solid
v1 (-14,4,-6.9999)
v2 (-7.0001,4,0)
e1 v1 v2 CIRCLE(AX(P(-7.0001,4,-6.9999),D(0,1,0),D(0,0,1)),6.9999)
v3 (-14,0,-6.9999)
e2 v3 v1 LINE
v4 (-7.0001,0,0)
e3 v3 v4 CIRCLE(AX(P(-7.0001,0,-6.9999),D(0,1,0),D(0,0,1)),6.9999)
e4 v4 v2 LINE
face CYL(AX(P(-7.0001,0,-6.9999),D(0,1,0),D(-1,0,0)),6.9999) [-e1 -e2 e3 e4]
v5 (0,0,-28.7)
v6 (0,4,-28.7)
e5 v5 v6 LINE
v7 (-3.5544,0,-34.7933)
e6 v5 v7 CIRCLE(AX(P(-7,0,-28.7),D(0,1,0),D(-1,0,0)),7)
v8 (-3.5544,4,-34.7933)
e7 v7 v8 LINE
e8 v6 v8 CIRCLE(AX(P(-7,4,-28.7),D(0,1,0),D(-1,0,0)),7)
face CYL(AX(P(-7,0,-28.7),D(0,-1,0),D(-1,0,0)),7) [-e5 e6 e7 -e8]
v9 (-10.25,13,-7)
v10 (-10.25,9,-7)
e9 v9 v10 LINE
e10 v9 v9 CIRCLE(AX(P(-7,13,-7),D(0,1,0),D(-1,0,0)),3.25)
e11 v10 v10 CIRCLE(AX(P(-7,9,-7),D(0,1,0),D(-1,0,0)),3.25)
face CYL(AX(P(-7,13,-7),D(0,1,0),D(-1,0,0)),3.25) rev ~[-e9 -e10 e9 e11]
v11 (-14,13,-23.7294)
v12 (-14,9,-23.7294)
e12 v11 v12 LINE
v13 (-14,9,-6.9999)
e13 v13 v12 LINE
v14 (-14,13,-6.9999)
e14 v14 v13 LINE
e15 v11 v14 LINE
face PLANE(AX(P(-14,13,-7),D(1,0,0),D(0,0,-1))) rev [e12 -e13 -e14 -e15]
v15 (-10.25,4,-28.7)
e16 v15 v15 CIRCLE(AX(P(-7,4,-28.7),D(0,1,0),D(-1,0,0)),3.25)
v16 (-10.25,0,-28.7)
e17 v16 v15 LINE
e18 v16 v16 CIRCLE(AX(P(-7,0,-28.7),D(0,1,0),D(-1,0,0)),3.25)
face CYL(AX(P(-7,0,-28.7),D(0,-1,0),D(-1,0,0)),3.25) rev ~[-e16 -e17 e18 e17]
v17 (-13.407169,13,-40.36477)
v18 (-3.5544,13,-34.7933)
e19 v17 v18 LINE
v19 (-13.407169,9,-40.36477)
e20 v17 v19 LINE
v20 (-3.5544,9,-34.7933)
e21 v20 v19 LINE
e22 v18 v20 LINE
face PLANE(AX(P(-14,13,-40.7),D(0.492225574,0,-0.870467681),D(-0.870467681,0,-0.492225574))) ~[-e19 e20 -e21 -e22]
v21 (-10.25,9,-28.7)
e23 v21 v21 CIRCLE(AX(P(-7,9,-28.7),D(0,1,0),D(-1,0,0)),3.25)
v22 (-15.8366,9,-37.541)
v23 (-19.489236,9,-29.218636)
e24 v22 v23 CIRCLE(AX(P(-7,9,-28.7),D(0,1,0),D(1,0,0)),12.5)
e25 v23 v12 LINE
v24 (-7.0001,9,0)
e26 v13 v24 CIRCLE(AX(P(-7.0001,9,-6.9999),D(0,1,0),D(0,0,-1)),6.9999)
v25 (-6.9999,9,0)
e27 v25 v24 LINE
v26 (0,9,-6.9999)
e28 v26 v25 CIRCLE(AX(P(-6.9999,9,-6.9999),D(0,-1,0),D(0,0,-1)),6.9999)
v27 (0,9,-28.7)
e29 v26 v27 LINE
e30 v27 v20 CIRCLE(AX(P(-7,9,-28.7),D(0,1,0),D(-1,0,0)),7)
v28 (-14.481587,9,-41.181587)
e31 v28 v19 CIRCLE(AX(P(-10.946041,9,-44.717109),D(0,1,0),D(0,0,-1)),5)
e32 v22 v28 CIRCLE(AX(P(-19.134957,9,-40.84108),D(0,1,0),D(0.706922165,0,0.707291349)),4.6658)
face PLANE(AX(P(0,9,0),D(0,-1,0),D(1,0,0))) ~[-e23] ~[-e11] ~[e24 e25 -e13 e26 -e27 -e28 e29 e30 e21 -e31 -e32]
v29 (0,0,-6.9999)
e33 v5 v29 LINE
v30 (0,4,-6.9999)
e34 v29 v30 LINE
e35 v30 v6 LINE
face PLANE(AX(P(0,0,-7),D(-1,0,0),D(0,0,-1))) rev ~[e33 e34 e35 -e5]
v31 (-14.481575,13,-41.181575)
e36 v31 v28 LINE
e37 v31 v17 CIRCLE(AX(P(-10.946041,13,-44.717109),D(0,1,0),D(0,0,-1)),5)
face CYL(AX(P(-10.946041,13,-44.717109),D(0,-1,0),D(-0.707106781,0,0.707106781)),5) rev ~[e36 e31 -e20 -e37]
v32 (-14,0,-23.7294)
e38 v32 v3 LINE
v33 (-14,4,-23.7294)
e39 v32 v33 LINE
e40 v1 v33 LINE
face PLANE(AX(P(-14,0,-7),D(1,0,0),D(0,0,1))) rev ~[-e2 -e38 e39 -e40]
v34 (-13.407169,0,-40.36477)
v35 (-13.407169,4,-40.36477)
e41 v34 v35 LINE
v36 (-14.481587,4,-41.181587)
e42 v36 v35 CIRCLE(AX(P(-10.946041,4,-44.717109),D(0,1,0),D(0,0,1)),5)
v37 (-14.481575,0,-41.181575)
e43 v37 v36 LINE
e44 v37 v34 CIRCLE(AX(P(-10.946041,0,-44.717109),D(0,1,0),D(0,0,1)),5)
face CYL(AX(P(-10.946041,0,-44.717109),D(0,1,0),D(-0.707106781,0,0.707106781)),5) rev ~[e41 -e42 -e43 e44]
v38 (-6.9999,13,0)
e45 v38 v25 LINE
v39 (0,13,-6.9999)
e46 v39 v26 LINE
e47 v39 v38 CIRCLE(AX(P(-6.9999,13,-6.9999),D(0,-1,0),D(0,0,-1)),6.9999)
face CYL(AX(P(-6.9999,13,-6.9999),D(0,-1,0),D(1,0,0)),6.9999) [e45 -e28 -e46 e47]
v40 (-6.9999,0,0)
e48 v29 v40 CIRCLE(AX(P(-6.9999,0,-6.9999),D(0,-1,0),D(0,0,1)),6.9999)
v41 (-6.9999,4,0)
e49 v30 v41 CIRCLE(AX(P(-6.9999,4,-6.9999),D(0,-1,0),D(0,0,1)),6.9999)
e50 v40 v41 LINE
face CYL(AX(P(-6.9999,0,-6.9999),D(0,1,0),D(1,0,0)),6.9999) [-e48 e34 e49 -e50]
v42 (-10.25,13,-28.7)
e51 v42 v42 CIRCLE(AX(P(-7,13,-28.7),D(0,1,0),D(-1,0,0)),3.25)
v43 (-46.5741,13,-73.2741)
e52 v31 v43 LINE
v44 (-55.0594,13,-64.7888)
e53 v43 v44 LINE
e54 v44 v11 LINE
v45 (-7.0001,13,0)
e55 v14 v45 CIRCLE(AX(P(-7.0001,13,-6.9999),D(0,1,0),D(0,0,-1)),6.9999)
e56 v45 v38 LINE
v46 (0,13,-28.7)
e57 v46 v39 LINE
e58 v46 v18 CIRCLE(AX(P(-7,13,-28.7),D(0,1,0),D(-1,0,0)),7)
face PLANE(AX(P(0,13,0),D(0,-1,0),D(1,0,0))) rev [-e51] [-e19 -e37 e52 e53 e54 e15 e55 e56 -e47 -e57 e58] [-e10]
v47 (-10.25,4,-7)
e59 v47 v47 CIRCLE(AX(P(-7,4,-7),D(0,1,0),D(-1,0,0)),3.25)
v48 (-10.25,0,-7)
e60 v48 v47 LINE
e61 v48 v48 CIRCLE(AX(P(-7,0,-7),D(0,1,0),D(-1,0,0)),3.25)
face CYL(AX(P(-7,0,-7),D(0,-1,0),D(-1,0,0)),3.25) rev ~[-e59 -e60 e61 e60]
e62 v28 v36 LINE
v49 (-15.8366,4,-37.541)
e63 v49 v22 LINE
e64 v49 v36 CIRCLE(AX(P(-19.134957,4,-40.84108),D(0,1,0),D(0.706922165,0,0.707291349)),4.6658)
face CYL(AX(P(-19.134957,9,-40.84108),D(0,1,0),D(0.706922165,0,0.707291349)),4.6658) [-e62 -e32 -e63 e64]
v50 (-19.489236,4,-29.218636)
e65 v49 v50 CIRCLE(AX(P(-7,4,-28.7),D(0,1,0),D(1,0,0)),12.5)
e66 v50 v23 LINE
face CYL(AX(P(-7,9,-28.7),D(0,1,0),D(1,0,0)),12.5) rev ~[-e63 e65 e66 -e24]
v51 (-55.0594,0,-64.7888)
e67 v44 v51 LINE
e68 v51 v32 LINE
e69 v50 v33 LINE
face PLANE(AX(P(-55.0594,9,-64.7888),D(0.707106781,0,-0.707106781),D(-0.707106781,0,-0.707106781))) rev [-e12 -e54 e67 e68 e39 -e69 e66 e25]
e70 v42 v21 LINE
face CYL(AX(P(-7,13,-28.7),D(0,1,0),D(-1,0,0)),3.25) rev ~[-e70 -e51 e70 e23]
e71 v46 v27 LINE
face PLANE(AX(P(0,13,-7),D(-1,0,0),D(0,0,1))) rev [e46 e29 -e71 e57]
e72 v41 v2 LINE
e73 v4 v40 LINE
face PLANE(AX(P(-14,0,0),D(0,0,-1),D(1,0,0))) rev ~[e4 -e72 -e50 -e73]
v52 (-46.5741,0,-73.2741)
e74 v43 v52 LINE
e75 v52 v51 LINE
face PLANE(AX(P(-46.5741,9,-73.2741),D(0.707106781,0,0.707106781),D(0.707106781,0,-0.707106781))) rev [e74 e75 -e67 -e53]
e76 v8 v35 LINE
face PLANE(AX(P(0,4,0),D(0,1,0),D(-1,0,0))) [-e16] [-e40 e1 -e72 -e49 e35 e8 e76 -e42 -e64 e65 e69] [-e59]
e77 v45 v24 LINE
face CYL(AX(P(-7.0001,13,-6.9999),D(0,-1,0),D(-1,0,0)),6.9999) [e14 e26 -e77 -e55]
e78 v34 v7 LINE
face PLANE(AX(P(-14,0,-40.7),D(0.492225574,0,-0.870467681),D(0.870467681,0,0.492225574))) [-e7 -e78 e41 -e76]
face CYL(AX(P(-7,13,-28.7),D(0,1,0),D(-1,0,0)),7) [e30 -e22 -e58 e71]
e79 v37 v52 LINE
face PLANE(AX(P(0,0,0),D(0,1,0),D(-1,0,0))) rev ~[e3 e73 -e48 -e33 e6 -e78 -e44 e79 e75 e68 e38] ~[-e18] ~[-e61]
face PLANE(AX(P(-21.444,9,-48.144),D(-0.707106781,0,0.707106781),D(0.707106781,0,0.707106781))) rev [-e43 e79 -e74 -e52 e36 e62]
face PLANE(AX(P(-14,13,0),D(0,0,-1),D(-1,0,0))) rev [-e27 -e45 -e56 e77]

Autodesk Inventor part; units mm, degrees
ref_plane "YZ Plane" through (0, 0, 0) normal (1, 0, 0) x (0, 1, 0)
ref_plane "XZ Plane" through (0, 0, 0) normal (0, 1, 0) x (-1, 0, 0)
ref_plane "XY Plane" through (0, 0, 0) normal (0, 0, 1) x (1, 0, 0)
sketch "Sketch1" plane through (0, 0, 0) normal (0, 1, 0) x (-1, 0, 0)
  line L0 (14, 0) -> (0, 0)
  line L1 (0, 0) -> (0, -35.7)
  line L2 (0, -35.7) -> (14, -35.7)
  line L3 (14, -35.7) -> (14, 0)
  circle A0 centre (7, -7) radius 3.25
  circle A1 centre (7, -28.7) radius 3.25
  arc A2 (14, -7) -> (0, -7) centre (7, -7) ccw
  line L4 (14, -35.7) -> (14, -40.7)
  line L5 (14, -40.7) -> (8.75, -40.7)
  line L6 (5.25, -40.7) -> (0, -40.7)
  line L7 (0, -40.7) -> (0, -35.7)
  line L8 (8.75, -40.7) -> (5.25, -40.7)
  line L9 (14, -40.7) -> (46.5741, -73.2741)
  line L10 (46.5741, -73.2741) -> (55.0594, -64.7888)
  line L11 (55.0594, -64.7888) -> (14, -23.7294)
  circle A3 centre (7, -28.7) radius 7
  line L12 (14, -40.7) -> (3.5544, -34.7933)
  point P0 (7, -35.7)
  point P1 (11.375, -40.7)
  point P2 (7, 0)
  point P3 (0, -28.7)
  dimension "d0" = 6.5
  dimension "d1" = 21.7
  dimension "d2" = 7
  dimension "d3" = 7
  dimension "d4" = 14
  dimension "d9" = 5
  dimension "d20" = 12
  dimension "d21" = 135
extrude "Extrusion1" add sketch "Sketch1" along normal blind 4 contours L3 A2 L0 | A2 L1 L0 | A2 L3 A3 L1 | L11 L10 L9 L4 L3 | A3 | L3 L2 A3 | A3 L2 L12 | L4 L12 L2
fillet "Fillet1" radius 5 1 edges at (-14, 2, -40.7)
sketch "Sketch3" plane through (0, 4, 0) normal (0, 1, 0) x (1, 0, 0)
  line L0 (-14, 0) -> (0, 0) projected
  line L1 (0, 0) -> (0, 28.7) projected
  arc A0 (0, 28.7) -> (-3.5544, 34.7933) centre (-7, 28.7) ccw projected
  line L2 (-3.5544, 34.7933) -> (-13.4072, 40.3648) projected
  arc A1 (-14.4816, 41.1816) -> (-13.4072, 40.3648) centre (-10.946, 44.7171) ccw projected
  line L3 (-14.4816, 41.1816) -> (-46.5741, 73.2741) projected
  line L4 (-46.5741, 73.2741) -> (-55.0594, 64.7888) projected
  line L5 (-55.0594, 64.7888) -> (-14, 23.7294) projected
  line L6 (-14, 23.7294) -> (-14, 0) projected
  circle A2 centre (-7, 7) radius 3.25 projected
  circle A3 centre (-7, 28.7) radius 3.25 projected
  circle A4 centre (-7, 28.7) radius 7
  line L7 (-14, 23.7294) -> (-9.3072, 22.0912)
  line L8 (-14, 23.7294) -> (-14, 28.7)
  line L9 (-14.4816, 41.1816) -> (-21.444, 48.144)
  circle A5 centre (-7, 28.7) radius 12.5
  arc A6 (-15.8366, 37.541) -> (-14.4816, 41.1816) centre (-19.1353, 40.8413) ccw
  point P0 (-3.5544, 34.7933)
  point P1 (-11.499, 34.0628)
  point P2 (-3.5544, 34.7933)
  point P3 (-19.4892, 29.2187)
  point P4 (-15.8366, 37.541)
  point P5 (-14.1011, 40.8383)
  point P6 (0, 18.3438)
  point P7 (-12.5691, 39.8909)
  point P8 (-14, 18.3438)
  dimension "d24" = 25
extrude "Extrusion4" add sketch "Sketch3" along normal blind 2.5 contours L5 L4 L3 A6 A5
mirror "Mirror3" about plane through (-34.7643, 6.5, -51.2464) normal (0, 1, 0) of "Extrusion4", "Fillet1", "Extrusion1"
fillet "Fillet3" radius 7 4 edges at (0, 11, 0) (-14, 11, 0) (-14, 2, 0) (0, 2, 0)
properties part number "R2_3DPrint"
